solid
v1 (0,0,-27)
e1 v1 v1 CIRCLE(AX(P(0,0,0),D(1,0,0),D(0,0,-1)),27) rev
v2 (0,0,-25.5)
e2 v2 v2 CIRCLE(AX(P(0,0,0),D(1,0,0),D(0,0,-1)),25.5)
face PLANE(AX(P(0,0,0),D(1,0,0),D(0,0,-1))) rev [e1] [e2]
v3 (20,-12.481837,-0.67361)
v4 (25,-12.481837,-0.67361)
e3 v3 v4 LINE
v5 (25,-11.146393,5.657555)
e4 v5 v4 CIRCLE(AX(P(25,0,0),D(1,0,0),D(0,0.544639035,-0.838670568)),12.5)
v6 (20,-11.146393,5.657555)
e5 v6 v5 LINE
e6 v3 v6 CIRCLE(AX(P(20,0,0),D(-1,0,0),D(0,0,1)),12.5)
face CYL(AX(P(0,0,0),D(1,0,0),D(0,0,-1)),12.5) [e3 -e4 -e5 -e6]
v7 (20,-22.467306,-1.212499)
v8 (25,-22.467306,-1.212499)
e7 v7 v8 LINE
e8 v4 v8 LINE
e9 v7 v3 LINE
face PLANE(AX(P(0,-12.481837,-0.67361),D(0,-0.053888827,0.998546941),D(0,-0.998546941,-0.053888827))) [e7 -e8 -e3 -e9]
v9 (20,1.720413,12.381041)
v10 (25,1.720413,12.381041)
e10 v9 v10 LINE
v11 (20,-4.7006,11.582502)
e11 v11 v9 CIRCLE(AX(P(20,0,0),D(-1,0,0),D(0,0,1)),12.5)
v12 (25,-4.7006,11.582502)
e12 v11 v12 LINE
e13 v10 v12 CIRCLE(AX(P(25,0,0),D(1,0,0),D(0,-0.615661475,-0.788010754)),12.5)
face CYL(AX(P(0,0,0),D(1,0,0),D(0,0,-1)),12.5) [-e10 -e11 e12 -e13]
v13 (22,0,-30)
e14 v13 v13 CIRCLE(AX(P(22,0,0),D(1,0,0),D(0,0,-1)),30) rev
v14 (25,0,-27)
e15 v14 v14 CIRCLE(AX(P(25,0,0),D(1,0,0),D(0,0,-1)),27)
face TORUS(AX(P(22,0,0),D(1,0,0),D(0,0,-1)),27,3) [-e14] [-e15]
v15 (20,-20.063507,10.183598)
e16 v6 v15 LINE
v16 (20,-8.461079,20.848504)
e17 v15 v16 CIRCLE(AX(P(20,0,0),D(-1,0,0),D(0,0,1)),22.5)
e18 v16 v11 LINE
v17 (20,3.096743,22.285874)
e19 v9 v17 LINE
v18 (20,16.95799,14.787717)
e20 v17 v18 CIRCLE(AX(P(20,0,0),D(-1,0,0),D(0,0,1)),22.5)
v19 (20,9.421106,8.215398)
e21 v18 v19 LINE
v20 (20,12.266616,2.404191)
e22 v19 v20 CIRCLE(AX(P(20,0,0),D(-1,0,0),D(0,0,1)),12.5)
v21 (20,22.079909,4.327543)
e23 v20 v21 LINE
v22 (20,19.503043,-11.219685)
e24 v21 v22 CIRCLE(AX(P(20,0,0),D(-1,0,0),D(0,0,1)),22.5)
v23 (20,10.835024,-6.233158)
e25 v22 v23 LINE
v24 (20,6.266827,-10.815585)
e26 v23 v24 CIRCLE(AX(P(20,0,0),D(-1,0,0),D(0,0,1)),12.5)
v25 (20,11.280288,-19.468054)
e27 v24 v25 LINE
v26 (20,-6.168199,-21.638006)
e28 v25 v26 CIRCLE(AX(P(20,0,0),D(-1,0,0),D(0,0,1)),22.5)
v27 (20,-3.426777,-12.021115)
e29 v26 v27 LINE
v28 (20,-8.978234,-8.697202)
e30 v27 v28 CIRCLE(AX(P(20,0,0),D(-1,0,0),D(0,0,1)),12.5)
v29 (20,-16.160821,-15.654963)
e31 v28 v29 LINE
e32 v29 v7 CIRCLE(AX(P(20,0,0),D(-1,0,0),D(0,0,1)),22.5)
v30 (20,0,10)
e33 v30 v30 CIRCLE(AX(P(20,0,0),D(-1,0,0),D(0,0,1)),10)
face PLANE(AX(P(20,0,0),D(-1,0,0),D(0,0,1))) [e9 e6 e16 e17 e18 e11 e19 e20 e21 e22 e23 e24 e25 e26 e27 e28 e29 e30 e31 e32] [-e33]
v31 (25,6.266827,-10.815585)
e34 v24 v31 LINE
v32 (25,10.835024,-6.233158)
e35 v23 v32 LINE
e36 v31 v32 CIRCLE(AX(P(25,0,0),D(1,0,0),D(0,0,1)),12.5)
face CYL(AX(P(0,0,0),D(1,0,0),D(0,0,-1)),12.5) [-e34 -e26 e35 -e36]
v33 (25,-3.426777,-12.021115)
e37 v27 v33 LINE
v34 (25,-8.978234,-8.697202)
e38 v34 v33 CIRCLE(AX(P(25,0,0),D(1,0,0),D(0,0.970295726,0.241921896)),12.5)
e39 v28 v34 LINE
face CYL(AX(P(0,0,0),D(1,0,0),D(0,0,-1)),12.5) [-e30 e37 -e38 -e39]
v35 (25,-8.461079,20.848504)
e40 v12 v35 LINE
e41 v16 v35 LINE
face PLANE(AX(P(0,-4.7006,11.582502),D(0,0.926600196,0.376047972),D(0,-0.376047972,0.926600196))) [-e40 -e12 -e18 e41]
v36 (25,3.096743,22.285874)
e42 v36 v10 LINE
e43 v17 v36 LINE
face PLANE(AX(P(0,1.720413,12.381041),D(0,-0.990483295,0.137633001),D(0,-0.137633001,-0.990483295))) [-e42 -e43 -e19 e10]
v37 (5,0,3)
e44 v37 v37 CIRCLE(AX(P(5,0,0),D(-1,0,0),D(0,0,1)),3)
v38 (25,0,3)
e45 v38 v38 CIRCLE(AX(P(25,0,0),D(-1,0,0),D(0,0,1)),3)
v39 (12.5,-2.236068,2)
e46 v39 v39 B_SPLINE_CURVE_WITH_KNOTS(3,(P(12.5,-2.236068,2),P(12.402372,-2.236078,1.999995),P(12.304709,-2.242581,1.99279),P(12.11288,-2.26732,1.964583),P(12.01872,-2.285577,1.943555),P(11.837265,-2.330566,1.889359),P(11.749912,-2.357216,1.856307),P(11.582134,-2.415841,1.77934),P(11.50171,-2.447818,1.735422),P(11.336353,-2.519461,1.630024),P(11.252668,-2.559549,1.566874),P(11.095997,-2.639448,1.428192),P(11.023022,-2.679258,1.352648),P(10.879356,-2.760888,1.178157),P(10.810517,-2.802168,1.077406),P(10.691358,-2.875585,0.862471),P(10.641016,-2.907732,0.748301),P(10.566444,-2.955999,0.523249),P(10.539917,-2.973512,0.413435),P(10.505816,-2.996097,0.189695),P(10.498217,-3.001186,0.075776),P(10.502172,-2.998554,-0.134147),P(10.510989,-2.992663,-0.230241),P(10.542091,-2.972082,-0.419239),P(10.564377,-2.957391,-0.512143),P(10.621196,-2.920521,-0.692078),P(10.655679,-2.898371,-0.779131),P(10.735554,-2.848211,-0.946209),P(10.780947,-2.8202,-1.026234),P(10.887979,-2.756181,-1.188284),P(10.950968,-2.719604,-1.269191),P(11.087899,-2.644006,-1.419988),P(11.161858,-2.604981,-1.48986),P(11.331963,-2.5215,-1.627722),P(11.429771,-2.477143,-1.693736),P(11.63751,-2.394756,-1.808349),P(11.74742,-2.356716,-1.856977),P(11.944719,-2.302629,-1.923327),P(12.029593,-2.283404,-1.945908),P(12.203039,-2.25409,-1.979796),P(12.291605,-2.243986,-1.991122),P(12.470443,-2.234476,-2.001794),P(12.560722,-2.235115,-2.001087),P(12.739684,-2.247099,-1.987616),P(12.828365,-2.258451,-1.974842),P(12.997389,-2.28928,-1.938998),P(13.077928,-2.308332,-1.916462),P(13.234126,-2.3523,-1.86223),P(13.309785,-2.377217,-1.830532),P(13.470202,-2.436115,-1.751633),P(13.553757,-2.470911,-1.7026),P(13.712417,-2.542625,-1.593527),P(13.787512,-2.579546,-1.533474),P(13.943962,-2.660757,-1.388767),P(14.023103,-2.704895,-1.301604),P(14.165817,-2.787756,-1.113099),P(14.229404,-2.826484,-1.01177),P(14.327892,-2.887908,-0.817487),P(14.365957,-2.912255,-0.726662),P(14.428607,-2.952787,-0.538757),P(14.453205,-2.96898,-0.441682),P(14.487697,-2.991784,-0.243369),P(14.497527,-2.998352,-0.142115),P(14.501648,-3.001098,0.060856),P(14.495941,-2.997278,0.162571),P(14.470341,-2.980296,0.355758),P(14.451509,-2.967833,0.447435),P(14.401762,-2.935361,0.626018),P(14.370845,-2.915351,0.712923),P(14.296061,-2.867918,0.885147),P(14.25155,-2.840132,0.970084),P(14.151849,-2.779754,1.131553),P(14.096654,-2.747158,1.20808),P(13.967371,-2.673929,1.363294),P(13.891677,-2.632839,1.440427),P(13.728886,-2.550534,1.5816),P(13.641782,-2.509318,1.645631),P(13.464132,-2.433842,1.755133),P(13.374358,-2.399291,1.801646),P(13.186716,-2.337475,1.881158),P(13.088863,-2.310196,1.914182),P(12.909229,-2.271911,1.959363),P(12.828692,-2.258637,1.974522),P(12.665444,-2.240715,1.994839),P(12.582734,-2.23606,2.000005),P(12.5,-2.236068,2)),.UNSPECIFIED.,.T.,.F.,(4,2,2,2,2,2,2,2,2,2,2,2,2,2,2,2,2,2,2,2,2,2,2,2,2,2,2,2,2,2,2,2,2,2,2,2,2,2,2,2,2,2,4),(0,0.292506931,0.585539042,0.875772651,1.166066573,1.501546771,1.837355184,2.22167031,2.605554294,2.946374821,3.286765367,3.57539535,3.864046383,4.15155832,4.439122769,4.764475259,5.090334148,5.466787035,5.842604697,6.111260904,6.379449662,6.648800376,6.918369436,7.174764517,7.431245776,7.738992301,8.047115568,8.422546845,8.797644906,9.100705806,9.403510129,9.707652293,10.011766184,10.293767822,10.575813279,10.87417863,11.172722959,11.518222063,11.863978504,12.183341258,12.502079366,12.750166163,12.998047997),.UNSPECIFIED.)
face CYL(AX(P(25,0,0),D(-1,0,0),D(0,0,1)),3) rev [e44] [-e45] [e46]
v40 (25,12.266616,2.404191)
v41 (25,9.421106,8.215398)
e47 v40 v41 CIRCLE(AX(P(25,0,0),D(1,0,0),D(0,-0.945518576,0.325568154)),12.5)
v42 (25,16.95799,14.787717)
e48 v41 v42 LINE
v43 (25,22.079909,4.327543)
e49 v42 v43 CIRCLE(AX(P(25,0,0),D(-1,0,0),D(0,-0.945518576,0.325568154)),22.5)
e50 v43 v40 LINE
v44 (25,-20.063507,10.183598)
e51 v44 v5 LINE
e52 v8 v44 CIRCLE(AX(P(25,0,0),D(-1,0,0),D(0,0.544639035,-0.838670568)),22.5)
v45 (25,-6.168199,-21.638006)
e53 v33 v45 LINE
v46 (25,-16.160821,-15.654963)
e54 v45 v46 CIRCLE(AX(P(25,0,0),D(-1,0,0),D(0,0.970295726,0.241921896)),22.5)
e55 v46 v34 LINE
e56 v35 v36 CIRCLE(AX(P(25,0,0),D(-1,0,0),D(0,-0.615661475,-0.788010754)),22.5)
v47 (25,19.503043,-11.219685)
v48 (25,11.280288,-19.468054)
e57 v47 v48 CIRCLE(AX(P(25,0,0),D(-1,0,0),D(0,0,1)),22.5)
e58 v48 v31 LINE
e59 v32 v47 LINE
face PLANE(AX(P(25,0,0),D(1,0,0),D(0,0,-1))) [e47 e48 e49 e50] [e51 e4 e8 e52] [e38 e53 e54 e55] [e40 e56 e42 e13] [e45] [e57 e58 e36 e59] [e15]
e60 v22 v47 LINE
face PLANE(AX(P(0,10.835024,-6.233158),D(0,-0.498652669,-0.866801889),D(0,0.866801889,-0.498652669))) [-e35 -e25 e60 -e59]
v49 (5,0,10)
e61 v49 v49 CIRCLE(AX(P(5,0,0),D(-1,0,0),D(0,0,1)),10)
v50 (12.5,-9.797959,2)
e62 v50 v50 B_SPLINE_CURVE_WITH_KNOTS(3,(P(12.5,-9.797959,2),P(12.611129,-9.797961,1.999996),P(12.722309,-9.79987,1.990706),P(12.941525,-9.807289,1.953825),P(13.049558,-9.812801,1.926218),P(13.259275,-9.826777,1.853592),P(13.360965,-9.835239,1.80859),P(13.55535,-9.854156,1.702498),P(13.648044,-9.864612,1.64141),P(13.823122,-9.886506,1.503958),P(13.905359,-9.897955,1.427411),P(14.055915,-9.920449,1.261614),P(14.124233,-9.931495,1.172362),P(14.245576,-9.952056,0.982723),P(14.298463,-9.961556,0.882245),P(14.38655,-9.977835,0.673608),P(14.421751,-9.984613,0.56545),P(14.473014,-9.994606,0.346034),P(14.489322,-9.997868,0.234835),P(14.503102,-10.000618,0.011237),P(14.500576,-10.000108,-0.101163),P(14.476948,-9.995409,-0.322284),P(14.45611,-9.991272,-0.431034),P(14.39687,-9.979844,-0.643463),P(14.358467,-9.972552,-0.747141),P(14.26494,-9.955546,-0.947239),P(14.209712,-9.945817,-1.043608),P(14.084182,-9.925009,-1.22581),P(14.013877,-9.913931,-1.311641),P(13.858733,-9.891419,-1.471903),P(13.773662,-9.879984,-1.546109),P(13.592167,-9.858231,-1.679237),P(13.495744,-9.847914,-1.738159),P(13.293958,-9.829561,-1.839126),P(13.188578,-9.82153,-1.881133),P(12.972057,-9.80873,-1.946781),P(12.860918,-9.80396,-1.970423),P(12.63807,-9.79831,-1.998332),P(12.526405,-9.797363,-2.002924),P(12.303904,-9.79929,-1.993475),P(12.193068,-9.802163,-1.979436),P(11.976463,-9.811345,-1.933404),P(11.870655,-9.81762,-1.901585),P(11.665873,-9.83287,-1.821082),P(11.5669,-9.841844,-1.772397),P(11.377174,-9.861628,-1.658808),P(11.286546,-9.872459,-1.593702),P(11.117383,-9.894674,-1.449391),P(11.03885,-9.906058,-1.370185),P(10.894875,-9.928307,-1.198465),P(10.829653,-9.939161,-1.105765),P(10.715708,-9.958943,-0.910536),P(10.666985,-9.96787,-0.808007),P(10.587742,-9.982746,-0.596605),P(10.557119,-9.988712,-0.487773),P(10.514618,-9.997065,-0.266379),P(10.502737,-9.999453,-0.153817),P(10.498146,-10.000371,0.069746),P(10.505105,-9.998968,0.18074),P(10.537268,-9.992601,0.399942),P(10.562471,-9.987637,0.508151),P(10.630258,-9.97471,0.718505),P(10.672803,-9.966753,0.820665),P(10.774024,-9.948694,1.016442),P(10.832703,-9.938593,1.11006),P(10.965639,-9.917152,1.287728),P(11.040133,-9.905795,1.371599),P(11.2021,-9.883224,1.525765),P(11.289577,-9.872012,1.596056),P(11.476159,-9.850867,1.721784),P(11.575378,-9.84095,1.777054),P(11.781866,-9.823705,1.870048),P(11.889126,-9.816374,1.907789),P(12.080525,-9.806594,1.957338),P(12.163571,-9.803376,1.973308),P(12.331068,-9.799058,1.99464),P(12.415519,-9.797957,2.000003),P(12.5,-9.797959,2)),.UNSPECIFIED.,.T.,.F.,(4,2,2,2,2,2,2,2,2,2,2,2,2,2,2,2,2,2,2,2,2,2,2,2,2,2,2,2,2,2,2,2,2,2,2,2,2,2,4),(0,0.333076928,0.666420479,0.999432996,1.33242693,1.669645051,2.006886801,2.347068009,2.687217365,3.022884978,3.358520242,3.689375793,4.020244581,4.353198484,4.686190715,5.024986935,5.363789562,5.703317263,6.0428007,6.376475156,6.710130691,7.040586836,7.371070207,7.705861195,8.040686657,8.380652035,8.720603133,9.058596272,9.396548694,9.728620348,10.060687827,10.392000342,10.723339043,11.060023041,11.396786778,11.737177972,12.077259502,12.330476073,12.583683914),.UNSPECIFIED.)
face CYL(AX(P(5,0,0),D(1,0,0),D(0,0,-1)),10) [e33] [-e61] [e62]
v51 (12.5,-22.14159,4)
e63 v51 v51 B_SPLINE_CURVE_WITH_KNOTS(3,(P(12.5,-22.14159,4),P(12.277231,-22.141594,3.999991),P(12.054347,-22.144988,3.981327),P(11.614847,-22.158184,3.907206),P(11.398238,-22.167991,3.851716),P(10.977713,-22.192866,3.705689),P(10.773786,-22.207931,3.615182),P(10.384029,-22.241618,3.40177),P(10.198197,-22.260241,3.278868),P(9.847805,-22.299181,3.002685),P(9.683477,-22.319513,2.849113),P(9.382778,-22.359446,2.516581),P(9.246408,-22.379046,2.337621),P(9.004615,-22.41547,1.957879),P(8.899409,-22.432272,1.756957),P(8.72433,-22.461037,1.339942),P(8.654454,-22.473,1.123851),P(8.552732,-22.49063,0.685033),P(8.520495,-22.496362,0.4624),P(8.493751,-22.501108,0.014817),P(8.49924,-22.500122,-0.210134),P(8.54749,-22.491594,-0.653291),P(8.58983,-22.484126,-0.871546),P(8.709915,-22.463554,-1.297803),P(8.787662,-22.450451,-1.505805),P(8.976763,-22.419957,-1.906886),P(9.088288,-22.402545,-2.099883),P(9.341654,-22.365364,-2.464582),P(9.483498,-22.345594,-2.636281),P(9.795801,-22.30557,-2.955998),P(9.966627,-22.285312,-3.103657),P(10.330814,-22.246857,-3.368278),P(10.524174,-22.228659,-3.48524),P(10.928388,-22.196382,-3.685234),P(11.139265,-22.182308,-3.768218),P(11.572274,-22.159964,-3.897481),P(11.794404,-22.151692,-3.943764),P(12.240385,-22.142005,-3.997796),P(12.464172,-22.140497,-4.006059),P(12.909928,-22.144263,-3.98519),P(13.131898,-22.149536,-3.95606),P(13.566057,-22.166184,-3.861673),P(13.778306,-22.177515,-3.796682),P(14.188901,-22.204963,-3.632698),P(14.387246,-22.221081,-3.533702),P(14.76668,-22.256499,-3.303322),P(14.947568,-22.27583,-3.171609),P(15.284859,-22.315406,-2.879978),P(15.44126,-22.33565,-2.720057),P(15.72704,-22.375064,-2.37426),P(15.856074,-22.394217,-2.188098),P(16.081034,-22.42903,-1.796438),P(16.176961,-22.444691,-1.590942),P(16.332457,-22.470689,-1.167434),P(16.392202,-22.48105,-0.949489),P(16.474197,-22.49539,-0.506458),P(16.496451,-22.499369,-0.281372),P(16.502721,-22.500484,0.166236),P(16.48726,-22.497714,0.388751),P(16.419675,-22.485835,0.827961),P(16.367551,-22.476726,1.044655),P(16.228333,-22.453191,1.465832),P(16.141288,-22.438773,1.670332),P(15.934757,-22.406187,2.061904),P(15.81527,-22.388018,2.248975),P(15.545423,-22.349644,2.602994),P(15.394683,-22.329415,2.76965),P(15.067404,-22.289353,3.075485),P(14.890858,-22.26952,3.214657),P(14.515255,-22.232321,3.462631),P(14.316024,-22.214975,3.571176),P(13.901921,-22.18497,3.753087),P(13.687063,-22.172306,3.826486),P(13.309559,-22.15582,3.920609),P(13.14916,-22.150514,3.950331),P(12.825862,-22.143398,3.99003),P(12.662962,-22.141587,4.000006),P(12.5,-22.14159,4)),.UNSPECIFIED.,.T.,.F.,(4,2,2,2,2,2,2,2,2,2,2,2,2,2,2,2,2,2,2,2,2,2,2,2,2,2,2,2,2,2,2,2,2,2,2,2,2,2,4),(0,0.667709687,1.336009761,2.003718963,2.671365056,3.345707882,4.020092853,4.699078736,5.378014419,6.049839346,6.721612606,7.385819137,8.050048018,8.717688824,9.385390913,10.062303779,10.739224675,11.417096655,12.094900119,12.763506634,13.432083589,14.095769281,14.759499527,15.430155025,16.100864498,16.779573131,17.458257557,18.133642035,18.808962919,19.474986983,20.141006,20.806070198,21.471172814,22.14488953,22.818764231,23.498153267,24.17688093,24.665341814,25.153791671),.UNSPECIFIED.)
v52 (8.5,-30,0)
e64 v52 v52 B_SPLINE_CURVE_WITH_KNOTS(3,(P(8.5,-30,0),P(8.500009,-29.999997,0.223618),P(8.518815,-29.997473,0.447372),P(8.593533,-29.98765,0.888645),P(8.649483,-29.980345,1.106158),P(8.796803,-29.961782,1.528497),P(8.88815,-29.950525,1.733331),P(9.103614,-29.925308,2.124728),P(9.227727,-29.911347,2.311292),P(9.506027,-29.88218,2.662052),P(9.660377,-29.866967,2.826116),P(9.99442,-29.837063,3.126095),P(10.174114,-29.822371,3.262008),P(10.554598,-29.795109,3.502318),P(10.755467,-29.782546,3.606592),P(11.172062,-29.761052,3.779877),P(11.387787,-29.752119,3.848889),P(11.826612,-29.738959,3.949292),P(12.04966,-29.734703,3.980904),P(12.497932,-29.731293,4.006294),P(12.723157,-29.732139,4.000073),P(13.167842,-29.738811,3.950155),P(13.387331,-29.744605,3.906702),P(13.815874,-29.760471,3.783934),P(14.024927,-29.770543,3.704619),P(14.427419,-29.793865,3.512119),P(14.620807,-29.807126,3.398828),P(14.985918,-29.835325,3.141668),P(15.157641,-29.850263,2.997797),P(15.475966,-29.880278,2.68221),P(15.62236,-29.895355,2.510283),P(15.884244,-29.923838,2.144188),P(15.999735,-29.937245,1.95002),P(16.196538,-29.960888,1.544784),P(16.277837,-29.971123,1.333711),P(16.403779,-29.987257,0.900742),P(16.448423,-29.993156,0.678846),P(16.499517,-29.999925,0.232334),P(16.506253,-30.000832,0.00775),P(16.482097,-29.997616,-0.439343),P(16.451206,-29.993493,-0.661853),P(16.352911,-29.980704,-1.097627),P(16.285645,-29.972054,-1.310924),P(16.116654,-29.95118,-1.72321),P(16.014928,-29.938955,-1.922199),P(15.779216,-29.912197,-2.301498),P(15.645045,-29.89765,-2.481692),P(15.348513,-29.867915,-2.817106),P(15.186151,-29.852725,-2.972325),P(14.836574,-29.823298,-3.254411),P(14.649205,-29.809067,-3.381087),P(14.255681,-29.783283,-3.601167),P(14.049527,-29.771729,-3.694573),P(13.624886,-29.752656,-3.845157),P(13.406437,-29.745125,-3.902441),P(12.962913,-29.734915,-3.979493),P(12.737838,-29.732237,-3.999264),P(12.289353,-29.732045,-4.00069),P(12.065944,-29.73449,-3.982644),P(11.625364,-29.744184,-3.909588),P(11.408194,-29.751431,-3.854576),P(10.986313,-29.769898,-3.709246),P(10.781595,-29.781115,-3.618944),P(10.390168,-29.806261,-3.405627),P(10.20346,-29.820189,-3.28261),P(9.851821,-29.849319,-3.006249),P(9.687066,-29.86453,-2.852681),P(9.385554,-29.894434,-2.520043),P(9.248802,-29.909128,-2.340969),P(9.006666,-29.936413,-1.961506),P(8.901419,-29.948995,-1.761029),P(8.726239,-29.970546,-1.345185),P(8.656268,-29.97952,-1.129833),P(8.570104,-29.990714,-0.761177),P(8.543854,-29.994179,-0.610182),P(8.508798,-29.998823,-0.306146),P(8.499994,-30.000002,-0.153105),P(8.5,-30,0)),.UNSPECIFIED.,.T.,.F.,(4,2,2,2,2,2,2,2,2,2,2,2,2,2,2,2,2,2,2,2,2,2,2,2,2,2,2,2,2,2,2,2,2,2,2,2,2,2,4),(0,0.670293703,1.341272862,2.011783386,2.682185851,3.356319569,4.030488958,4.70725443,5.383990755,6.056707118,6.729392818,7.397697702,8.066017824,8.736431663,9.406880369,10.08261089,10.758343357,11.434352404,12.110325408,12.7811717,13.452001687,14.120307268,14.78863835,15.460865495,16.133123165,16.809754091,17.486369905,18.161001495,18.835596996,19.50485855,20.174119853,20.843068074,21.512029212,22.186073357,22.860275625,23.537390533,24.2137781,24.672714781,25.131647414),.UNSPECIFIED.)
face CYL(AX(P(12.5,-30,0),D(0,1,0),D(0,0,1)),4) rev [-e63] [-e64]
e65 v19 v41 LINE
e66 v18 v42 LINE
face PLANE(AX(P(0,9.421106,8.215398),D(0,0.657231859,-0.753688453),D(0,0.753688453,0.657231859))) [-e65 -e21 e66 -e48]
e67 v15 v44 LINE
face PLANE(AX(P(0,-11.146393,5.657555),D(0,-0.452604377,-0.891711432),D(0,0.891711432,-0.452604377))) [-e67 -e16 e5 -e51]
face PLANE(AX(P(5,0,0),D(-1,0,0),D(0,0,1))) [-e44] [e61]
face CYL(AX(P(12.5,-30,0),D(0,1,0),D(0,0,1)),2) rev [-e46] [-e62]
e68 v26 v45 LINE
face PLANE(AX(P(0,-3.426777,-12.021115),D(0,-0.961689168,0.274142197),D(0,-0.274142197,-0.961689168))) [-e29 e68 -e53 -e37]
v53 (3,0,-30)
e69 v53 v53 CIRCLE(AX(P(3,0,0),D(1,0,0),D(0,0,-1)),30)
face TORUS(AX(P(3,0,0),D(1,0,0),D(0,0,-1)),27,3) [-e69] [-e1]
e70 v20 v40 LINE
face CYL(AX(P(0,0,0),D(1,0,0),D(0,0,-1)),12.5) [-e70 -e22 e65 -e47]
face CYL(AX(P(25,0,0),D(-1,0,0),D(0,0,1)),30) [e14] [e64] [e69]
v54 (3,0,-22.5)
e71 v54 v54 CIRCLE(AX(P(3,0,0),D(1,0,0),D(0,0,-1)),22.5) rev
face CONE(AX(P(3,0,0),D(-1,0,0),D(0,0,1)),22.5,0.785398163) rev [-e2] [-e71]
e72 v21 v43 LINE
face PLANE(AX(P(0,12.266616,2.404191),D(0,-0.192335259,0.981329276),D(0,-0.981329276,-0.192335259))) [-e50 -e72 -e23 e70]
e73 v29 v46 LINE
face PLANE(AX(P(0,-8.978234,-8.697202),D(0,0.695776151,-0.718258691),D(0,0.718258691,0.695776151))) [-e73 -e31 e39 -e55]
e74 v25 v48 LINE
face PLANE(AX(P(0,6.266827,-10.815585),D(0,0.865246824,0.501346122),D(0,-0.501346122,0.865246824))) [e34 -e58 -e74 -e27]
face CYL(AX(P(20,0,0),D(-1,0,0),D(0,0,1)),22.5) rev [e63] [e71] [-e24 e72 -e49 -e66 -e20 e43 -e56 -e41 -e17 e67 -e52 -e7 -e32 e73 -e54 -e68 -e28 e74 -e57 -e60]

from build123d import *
from build123d.topology import SkipClean

# Parameters (mm, degrees)
SKETCH1_R           = 30
BOSS_EXTRUDE1_DEPTH = 25
FILLET1_R           = 3
SKETCH3_R           = 22.5
CUT_EXTRUDE1_DEPTH  = 20
CHAMFER1_SIZE       = 3
CUT_EXTRUDE2_DEPTH  = 50.244289131
CIRPATTERN1_COUNT   = 5
CIRPATTERN1_ANGLE   = 284
SKETCH4_R           = 10
BOSS_EXTRUDE2_DEPTH = 15
SKETCH5_R           = 3
CUT_EXTRUDE3_DEPTH  = 47.904157726
SKETCH6_R           = 2
CUT_EXTRUDE4_DEPTH  = 50.244289131
SKETCH7_R           = 4
CUT_EXTRUDE5_DEPTH  = 64.442887868


with BuildPart() as part:
    # Sketch1 → Boss-Extrude1 (new body)
    with BuildSketch(Plane(origin=(0, 0, 0), x_dir=(0, 0, -1), z_dir=(1, 0, 0))):
        Circle(SKETCH1_R)
    extrude(amount=BOSS_EXTRUDE1_DEPTH)

    # Fillet1
    fillet1_edges = [part.edges().sort_by_distance(p)[0] for p in [
        (0, 0, 30),
        (25, 0, 30),
    ]]
    fillet(fillet1_edges, radius=FILLET1_R)

    # Sketch3 → Cut-Extrude1 (cut)
    with BuildSketch(Plane.ZY):
        Circle(SKETCH3_R)
    extrude(amount=-CUT_EXTRUDE1_DEPTH, mode=Mode.SUBTRACT)

    # Chamfer1
    chamfer1_edges = [part.edges().sort_by_distance(p)[0] for p in [
        (0, 0, -22.5),
    ]]
    chamfer(chamfer1_edges, length=CHAMFER1_SIZE)

    # Sketch2 → Cut-Extrude2 (cut, through all)
    with BuildSketch(Plane.ZY.offset(-25)):
        with BuildLine():
            Line((-6.233158363, 10.835023619), (-11.219685054, 19.503042514))
            ThreePointArc((-11.219685054, 19.503042514), (-15.885142396, 15.934624283), (-19.468053536, 11.280287741))
            Line((-19.468053536, 11.280287741), (-10.815585298, 6.266826523))
            ThreePointArc((-10.815585298, 6.266826523), (-8.825079109, 8.852569046), (-6.233158363, 10.835023619))
        make_face()
    cut_extrude2 = extrude(amount=CUT_EXTRUDE2_DEPTH, mode=Mode.SUBTRACT)

    # CirPattern1: Cut-Extrude2 ×5 about axis
    with SkipClean():  # the faces are left unmerged after this step: merging them gives an invalid solid
        cirpattern1_axis = Axis((25, 0, 0), (1, 0, 0))
        for i in range(1, CIRPATTERN1_COUNT):
            add(cut_extrude2.rotate(cirpattern1_axis, i * CIRPATTERN1_ANGLE / (CIRPATTERN1_COUNT - 1)), mode=Mode.SUBTRACT)
    add(part.part.scale(1), mode=Mode.REPLACE)  # the faces are merged on a copy

    # Sketch4 → Boss-Extrude2 (add)
    with BuildSketch(Plane.ZY.offset(-20)):
        Circle(SKETCH4_R)
    extrude(amount=BOSS_EXTRUDE2_DEPTH)

    # Sketch5 → Cut-Extrude3 (cut, through all)
    with BuildSketch(Plane.ZY.offset(-5)):
        Circle(SKETCH5_R)
    extrude(amount=-CUT_EXTRUDE3_DEPTH, mode=Mode.SUBTRACT)

    # Sketch6 → Cut-Extrude4 (cut, through all)
    with BuildSketch(Plane(origin=(0, 0, 0), x_dir=(1, 0, 0), z_dir=(0, 1, 0))):
        with Locations((12.5, 0)):
            Circle(SKETCH6_R)
    extrude(amount=-CUT_EXTRUDE4_DEPTH, mode=Mode.SUBTRACT)

    # Sketch7 → Cut-Extrude5 (cut, through all)
    with BuildSketch(Plane(origin=(0, -20, 0), x_dir=(1, 0, 0), z_dir=(0, 1, 0))):
        with Locations((12.5, 0)):
            Circle(SKETCH7_R)
    extrude(amount=-CUT_EXTRUDE5_DEPTH, mode=Mode.SUBTRACT)


solid = part.part
